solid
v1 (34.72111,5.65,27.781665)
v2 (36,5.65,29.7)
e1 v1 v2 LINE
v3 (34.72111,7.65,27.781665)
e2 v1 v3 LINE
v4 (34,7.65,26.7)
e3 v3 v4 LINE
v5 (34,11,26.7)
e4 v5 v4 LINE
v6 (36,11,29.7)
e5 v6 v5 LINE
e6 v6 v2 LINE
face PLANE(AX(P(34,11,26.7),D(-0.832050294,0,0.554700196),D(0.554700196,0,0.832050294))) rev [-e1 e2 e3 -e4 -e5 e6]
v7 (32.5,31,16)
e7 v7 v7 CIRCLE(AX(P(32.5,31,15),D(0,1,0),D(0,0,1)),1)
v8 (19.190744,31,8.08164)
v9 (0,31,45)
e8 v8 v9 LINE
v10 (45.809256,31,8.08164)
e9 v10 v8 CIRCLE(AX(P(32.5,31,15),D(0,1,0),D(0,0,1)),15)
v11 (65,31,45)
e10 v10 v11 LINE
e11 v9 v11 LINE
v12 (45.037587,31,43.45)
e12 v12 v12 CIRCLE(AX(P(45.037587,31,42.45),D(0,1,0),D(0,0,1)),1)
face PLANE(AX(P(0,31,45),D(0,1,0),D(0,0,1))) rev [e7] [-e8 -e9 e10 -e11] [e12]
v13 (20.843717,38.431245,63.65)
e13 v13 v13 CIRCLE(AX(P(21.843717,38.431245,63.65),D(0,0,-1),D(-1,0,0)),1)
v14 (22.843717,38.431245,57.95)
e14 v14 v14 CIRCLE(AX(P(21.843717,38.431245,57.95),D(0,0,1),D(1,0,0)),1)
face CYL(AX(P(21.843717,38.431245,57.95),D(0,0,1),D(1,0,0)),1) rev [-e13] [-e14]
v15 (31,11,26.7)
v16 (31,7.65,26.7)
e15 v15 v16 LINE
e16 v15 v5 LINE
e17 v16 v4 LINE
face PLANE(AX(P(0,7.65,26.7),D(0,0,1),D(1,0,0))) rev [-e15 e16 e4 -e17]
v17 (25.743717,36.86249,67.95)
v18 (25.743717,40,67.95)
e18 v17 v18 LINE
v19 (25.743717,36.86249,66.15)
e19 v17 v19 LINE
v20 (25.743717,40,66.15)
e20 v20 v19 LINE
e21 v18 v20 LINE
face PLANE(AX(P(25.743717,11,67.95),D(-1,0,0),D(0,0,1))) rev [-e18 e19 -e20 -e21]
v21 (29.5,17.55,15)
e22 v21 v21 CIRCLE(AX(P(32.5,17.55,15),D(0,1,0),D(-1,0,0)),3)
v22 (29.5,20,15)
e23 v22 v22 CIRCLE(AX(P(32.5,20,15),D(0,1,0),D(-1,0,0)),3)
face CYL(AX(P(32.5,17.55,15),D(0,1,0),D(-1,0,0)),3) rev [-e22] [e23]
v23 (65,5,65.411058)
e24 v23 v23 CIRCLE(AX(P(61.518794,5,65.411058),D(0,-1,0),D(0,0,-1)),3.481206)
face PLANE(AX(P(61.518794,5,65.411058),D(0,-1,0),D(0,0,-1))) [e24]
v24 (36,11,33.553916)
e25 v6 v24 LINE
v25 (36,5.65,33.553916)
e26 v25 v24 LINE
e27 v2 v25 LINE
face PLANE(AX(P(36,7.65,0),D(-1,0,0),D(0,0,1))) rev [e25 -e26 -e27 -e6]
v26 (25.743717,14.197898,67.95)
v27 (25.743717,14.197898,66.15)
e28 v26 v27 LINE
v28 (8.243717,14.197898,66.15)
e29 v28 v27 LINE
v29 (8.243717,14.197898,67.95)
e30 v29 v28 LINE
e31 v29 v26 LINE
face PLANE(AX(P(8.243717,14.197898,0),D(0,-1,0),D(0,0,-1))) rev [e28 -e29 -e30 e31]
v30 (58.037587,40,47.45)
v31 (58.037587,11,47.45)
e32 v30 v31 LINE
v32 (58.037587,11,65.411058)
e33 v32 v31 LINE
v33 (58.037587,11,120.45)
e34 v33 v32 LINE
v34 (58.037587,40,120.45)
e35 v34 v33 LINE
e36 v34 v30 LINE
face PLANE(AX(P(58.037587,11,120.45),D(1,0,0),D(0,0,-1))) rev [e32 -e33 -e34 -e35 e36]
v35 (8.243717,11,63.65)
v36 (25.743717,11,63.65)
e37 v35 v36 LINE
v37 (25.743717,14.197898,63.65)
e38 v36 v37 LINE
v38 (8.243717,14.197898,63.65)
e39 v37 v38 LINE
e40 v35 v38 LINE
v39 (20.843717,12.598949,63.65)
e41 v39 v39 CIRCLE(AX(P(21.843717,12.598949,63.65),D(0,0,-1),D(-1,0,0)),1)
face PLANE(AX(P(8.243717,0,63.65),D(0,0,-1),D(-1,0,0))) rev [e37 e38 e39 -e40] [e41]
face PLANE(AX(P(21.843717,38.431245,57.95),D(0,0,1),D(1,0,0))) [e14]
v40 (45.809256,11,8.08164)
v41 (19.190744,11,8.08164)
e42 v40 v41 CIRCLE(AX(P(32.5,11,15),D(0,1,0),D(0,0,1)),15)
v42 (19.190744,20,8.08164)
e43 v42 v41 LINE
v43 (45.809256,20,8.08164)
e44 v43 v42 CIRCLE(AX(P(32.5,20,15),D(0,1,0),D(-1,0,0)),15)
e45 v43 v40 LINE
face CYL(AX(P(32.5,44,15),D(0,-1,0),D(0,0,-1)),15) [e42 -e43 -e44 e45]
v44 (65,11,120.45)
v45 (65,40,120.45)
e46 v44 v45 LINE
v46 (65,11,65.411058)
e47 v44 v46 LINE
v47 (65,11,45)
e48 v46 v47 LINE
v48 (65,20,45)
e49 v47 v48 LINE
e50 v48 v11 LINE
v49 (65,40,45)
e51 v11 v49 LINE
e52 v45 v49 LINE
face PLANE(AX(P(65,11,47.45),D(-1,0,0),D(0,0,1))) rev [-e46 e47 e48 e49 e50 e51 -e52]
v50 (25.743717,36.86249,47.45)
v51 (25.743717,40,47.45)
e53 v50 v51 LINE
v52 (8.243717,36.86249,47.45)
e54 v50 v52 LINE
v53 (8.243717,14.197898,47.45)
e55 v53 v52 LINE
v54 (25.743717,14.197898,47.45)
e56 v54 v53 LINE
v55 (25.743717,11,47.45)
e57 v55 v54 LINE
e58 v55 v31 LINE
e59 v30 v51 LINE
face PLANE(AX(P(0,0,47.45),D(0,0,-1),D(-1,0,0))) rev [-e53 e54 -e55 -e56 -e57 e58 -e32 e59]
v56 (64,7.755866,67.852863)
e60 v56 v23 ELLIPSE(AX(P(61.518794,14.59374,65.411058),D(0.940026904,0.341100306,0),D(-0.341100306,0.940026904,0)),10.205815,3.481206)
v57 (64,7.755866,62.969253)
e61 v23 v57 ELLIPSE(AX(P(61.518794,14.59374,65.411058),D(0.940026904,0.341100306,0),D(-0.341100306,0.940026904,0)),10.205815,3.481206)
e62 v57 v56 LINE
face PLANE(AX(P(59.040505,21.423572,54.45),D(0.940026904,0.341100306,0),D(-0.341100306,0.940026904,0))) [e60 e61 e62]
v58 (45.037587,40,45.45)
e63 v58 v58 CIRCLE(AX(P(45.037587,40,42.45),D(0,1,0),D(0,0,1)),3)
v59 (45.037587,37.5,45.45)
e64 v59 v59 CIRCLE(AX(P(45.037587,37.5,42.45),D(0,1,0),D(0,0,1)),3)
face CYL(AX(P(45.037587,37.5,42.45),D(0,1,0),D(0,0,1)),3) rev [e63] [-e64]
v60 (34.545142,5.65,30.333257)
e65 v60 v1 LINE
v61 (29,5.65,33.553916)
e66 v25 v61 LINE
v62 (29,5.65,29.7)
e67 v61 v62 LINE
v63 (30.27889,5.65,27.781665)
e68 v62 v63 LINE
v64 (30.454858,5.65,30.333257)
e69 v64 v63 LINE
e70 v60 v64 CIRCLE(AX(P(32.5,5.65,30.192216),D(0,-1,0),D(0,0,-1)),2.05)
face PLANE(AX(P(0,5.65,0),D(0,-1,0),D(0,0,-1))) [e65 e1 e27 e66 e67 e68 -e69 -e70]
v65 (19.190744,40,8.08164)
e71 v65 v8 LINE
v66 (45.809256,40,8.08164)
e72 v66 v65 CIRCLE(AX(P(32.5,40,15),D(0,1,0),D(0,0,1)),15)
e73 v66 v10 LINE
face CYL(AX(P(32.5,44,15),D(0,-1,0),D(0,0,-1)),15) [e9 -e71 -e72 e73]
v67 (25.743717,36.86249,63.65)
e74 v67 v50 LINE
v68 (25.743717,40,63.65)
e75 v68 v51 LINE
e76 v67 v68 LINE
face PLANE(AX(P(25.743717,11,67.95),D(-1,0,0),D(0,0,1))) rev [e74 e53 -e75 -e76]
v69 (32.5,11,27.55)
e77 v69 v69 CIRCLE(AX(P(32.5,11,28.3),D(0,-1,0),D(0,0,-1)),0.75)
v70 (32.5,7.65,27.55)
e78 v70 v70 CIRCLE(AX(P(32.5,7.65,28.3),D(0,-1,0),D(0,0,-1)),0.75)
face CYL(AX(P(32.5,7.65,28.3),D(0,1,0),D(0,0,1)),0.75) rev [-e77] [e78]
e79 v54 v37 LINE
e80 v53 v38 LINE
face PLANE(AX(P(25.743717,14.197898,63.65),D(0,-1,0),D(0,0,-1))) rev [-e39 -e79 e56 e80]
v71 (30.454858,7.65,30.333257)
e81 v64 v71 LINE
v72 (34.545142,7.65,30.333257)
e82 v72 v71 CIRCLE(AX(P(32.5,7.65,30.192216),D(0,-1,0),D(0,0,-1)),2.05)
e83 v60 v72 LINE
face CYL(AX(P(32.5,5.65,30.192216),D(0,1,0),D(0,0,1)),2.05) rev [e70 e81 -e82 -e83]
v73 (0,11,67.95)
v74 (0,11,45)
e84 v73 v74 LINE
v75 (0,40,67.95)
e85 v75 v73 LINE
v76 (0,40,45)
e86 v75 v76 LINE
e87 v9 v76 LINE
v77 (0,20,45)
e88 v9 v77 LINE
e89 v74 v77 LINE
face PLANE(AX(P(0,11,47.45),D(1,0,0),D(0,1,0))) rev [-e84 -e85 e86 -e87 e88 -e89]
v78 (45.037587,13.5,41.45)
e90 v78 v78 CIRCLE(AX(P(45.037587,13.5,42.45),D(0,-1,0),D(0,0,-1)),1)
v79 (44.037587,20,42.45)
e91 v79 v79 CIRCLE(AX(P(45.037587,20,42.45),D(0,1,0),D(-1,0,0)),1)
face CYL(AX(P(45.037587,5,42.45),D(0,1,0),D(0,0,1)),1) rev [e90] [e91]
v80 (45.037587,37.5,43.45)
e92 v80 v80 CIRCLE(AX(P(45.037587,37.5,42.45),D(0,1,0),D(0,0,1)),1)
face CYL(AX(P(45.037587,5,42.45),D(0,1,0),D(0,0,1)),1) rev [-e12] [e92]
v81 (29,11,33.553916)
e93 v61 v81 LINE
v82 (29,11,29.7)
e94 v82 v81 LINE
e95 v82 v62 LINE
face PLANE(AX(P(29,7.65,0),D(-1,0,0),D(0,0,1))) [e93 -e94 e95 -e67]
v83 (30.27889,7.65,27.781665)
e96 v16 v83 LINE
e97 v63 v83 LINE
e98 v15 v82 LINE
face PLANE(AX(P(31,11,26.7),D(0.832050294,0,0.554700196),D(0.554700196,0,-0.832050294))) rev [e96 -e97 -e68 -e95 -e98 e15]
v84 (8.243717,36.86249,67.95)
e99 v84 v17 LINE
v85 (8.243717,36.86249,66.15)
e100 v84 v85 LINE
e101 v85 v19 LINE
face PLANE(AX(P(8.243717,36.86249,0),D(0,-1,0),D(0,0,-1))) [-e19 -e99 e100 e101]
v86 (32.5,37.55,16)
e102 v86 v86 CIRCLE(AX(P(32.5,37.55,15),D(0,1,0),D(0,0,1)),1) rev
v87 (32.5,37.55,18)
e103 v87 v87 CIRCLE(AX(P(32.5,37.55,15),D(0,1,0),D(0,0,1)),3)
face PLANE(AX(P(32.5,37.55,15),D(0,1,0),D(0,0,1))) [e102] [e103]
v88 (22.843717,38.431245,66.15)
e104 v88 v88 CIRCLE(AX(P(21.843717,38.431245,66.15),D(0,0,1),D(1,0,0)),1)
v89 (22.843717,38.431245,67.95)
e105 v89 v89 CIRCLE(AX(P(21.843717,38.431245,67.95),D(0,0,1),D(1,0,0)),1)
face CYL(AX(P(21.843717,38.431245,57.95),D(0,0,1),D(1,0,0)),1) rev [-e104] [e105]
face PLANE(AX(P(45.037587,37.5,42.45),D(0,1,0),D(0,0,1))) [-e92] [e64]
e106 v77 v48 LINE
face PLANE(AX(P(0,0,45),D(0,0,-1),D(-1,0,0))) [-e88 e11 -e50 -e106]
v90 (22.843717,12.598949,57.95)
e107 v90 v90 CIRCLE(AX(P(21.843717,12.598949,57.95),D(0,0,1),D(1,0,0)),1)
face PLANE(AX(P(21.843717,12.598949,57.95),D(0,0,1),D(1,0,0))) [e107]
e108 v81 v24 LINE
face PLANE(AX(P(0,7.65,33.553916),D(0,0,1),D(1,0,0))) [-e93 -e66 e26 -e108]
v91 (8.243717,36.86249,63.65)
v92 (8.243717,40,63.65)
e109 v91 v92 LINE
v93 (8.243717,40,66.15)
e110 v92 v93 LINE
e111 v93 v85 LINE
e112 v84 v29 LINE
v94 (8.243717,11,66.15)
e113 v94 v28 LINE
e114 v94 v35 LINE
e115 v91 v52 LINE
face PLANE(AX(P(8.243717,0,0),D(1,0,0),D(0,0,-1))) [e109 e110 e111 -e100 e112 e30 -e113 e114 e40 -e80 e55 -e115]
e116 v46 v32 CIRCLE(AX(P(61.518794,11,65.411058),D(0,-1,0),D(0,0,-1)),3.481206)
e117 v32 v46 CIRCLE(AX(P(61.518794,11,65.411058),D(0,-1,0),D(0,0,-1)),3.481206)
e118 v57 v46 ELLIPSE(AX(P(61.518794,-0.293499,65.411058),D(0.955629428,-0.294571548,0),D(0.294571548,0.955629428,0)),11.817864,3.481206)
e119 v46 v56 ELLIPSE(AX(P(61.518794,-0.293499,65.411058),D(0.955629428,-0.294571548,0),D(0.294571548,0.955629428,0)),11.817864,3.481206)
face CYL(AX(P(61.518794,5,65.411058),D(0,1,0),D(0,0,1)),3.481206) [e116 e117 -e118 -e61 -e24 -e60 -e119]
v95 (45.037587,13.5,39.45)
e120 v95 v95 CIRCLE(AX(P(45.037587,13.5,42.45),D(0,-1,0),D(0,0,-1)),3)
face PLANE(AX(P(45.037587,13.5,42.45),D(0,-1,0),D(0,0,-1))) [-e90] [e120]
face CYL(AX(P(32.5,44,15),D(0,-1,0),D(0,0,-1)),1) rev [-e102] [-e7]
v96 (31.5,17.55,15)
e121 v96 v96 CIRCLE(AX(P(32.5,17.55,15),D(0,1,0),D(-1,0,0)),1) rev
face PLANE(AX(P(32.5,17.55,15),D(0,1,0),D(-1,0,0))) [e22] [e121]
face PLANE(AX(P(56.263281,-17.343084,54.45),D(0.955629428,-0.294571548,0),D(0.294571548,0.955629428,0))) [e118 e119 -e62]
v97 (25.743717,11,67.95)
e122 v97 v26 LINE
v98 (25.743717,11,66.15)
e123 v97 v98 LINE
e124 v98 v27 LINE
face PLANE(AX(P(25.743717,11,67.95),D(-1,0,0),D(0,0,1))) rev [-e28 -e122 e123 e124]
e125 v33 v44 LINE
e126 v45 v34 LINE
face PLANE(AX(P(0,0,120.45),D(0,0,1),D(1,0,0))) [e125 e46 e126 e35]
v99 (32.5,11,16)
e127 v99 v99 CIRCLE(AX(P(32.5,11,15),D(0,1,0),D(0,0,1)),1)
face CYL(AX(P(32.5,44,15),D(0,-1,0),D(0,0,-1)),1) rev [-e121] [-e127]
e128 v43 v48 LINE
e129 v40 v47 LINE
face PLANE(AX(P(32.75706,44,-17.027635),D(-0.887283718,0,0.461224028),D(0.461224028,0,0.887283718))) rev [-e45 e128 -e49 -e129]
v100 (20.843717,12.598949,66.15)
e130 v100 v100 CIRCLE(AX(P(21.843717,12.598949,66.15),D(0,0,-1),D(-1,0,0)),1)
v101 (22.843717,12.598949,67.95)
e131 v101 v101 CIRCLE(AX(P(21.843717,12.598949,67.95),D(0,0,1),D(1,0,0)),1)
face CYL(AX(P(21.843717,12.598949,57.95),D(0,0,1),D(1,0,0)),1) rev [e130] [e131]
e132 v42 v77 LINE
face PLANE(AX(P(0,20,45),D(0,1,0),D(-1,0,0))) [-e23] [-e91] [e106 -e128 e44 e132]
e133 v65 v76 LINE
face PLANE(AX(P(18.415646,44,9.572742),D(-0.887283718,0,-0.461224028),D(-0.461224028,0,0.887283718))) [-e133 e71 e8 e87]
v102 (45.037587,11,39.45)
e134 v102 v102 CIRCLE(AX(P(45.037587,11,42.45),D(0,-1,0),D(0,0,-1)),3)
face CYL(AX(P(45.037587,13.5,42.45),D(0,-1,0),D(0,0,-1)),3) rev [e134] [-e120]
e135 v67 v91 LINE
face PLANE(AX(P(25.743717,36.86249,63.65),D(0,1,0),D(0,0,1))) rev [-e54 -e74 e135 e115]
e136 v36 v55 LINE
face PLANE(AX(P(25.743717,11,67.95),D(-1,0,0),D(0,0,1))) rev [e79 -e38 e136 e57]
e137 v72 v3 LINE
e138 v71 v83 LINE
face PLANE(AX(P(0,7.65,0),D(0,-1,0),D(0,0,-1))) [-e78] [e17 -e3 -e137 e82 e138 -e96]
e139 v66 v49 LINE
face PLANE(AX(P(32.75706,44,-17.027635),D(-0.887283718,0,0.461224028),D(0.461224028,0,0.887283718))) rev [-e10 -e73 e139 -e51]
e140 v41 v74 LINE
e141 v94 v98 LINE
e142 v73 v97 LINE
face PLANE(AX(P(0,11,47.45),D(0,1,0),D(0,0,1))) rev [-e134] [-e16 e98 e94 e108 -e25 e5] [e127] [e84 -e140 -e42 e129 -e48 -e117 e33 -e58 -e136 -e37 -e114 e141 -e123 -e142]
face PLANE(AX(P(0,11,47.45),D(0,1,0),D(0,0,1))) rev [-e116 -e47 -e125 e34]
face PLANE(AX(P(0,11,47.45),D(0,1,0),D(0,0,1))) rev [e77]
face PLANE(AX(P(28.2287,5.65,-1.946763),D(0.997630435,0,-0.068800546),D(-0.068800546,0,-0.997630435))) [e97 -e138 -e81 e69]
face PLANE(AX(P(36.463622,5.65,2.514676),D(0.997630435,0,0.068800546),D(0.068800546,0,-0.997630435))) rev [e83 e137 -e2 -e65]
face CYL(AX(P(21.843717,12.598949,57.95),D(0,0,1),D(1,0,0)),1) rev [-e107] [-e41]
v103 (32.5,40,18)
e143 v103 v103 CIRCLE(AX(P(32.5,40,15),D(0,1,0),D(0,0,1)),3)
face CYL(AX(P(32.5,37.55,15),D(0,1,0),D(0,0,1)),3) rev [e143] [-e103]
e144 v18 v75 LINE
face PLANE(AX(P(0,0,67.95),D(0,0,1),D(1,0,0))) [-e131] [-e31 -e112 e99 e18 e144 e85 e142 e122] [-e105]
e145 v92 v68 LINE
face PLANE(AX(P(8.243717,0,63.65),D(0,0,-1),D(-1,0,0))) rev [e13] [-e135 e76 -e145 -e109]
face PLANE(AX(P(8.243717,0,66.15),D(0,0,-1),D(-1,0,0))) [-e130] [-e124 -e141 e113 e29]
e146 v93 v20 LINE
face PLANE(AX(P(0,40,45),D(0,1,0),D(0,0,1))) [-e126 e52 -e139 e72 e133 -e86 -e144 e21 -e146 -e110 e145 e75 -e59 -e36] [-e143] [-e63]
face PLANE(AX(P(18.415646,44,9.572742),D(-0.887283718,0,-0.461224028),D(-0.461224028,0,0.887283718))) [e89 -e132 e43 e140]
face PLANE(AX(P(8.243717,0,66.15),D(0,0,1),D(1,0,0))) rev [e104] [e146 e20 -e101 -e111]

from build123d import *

# Parameters (mm, degrees)
SKETCH1_W             = 65
SKETCH1_H             = 9
BOSS_EXTRUDE1_DEPTH   = 45
BOSS_EXTRUDE1_2_DEPTH = 45
SKETCH2_R             = 1
CUT_EXTRUDE5_DEPTH    = 34
CUT_EXTRUDE6_DEPTH    = 34
SKETCH3_R             = 3
CUT_EXTRUDE7_DEPTH    = 2.45
SKETCH4_R             = 3
CUT_EXTRUDE8_DEPTH    = 2.45
SKETCH5_W             = 65
SKETCH5_H             = 29
BOSS_EXTRUDE2_DEPTH   = 2.45
SKETCH6_W             = 7
SKETCH6_H             = 6.853915881
SKETCH6_R             = 0.75
BOSS_EXTRUDE3_DEPTH   = 3.35
CUT_EXTRUDE9_DEPTH    = 3.35
BOSS_EXTRUDE4_DEPTH   = 2
SKETCH9_W             = 6.962412957
SKETCH9_H             = 29
BOSS_EXTRUDE5_DEPTH   = 73
SKETCH10_R            = 3
CUT_EXTRUDE10_DEPTH   = 2.5
CUT_EXTRUDE11_START   = -2.5
SKETCH11_R            = 3
CUT_EXTRUDE11_DEPTH   = 2.5
SKETCH12_R            = 1
CUT_EXTRUDE12_DEPTH   = 32.5
SKETCH13_W            = 25.743716973
SKETCH13_H            = 29
BOSS_EXTRUDE6_DEPTH   = 20.5
SKETCH14_W            = 16.2
SKETCH14_H            = 32.7
CUT_EXTRUDE13_DEPTH   = 17.5
SKETCH16_W            = 16.2
SKETCH16_H            = 3.197897976
SKETCH16_H_2          = 3.137509592
BOSS_EXTRUDE7_DEPTH   = 17.5
CUT_EXTRUDE14_DEPTH   = 17.5
SKETCH19_R            = 1
CUT_EXTRUDE15_DEPTH   = 10
SKETCH20_R            = 3.481206478
BOSS_EXTRUDE8_DEPTH   = 6
CUT_EXTRUDE17_DEPTH   = 66


with BuildPart() as part:
    # Sketch1 → Boss-Extrude1 (new body)
    with BuildSketch(Plane.XY):
        with Locations((32.5, 15.5)):
            Rectangle(SKETCH1_W, SKETCH1_H)
    extrude(amount=BOSS_EXTRUDE1_DEPTH)


with BuildPart() as body_2:
    # Sketch1 → Boss-Extrude1 2 (new body)
    with BuildSketch(Plane.XY):
        with Locations((32.5, 35.5)):
            Rectangle(SKETCH1_W, SKETCH1_H)
    extrude(amount=BOSS_EXTRUDE1_2_DEPTH)


with BuildPart() as cut_extrude5_tool:
    # Sketch2 → Cut-Extrude5 (new body)
    with BuildSketch(Plane.XZ.offset(-10)):
        with BuildLine():
            ThreePointArc((45.80925577, 8.081639583), (40.285389963, 2.178623197), (32.5, 0))
            Line((32.5, 0), (65, 0))
            Line((65, 0), (65, 45))
            Line((65, 45), (45.80925577, 8.081639583))
        make_face()
        with Locations((32.5, 15)):
            Circle(SKETCH2_R)
    extrude(amount=-CUT_EXTRUDE5_DEPTH)


with BuildPart() as part_1:
    add(part.part)

    # Cut-Extrude5: cut by cut_extrude5_tool
    add(cut_extrude5_tool.part, mode=Mode.SUBTRACT)


with BuildPart() as body_2_1:
    add(body_2.part)

    # Cut-Extrude5: cut by cut_extrude5_tool
    add(cut_extrude5_tool.part, mode=Mode.SUBTRACT)


with BuildPart() as cut_extrude6_tool:
    # Sketch2<6> → Cut-Extrude6 (new body)
    with BuildSketch(Plane.XZ.offset(-10)):
        with BuildLine():
            Line((19.19074423, 8.081639583), (0, 45))
            Line((0, 45), (0, 0))
            Line((0, 0), (32.5, 0))
            ThreePointArc((32.5, 0), (24.714610037, 2.178623197), (19.19074423, 8.081639583))
        make_face()
    extrude(amount=-CUT_EXTRUDE6_DEPTH)


with BuildPart() as part_2:
    add(part_1.part)

    # Cut-Extrude6: cut by cut_extrude6_tool
    add(cut_extrude6_tool.part, mode=Mode.SUBTRACT)

    # Sketch4 → Cut-Extrude8 (cut)
    with BuildSketch(Plane(origin=(0, 20, 0), x_dir=(1, 0, 0), z_dir=(0, 1, 0))):
        with Locations((32.5, -15)):
            Circle(SKETCH4_R)
    extrude(amount=-CUT_EXTRUDE8_DEPTH, mode=Mode.SUBTRACT)



with BuildPart() as body_2_2:
    add(body_2_1.part)

    # Cut-Extrude6: cut by cut_extrude6_tool
    add(cut_extrude6_tool.part, mode=Mode.SUBTRACT)

    # Sketch3 → Cut-Extrude7 (cut)
    with BuildSketch(Plane(origin=(0, 40, 0), x_dir=(1, 0, 0), z_dir=(0, 1, 0))):
        with Locations((32.5, -15)):
            Circle(SKETCH3_R)
    extrude(amount=-CUT_EXTRUDE7_DEPTH, mode=Mode.SUBTRACT)


with BuildPart() as part_3:
    add(part_2.part)

    add(body_2_2.part)  # Boss-Extrude2 merges body 2
    # Sketch5 → Boss-Extrude2 (add)
    with BuildSketch(Plane.XY.offset(45)):
        with Locations((32.5, 25.5)):
            Rectangle(SKETCH5_W, SKETCH5_H)
    extrude(amount=BOSS_EXTRUDE2_DEPTH)

    # Sketch6 → Boss-Extrude3 (add)
    with BuildSketch(Plane.XZ.offset(-11)):
        with Locations((32.5, 30.126957941)):
            Rectangle(SKETCH6_W, SKETCH6_H)
        with Locations((32.5, 28.3)):
            Circle(SKETCH6_R, mode=Mode.SUBTRACT)
    extrude(amount=BOSS_EXTRUDE3_DEPTH)

    # Sketch7 → Cut-Extrude9 (cut)
    with BuildSketch(Plane.XZ.offset(-7.65)):
        Polygon((29, 29.7), (29, 26.7), (31, 26.7), align=None)
        Polygon((34, 26.7), (36, 29.7), (36, 26.7), align=None)
    extrude(amount=-CUT_EXTRUDE9_DEPTH, mode=Mode.SUBTRACT)

    # Sketch8 → Boss-Extrude4 (add)
    with BuildSketch(Plane.XZ.offset(-7.65)):
        with BuildLine():
            ThreePointArc((30.454857608, 30.333257), (32.5, 32.242215881), (34.545142392, 30.333257))
            Line((34.545142392, 30.333257), (34.721110255, 27.781665383))
            Line((34.721110255, 27.781665383), (36, 29.7))
            Line((36, 29.7), (36, 33.553915881))
            Line((36, 33.553915881), (29, 33.553915881))
            Line((29, 33.553915881), (29, 29.7))
            Line((29, 29.7), (30.278889745, 27.781665383))
            Line((30.278889745, 27.781665383), (30.454857608, 30.333257))
        make_face()
    extrude(amount=BOSS_EXTRUDE4_DEPTH)

    # Sketch9 → Boss-Extrude5 (add)
    with BuildSketch(Plane.XY.offset(47.45)):
        with Locations((61.518793522, 25.5)):
            Rectangle(SKETCH9_W, SKETCH9_H)
    extrude(amount=BOSS_EXTRUDE5_DEPTH)

    # Sketch10 → Cut-Extrude10 (cut)
    with BuildSketch(Plane.XZ.offset(-11)):
        with Locations((45.037587043, 42.45)):
            Circle(SKETCH10_R)
    extrude(amount=-CUT_EXTRUDE10_DEPTH, mode=Mode.SUBTRACT)

    # Sketch11 → Cut-Extrude11 (cut)
    with BuildSketch(Plane(origin=(0, 40, 0), x_dir=(1, 0, 0), z_dir=(0, 1, 0)).offset(CUT_EXTRUDE11_START)):
        with Locations((45.037587043, -42.45)):
            Circle(SKETCH11_R)
    extrude(amount=CUT_EXTRUDE11_DEPTH, mode=Mode.SUBTRACT)

    # Sketch12 → Cut-Extrude12 (cut)
    with BuildSketch(Plane(origin=(0, 37.5, 0), x_dir=(1, 0, 0), z_dir=(0, 1, 0))):
        with Locations((45.037587043, -42.45)):
            Circle(SKETCH12_R)
    extrude(amount=-CUT_EXTRUDE12_DEPTH, mode=Mode.SUBTRACT)

    # Sketch13 → Boss-Extrude6 (add)
    with BuildSketch(Plane.XY.offset(47.45)):
        with Locations((12.871858487, 25.5)):
            Rectangle(SKETCH13_W, SKETCH13_H)
    extrude(amount=BOSS_EXTRUDE6_DEPTH)

    # Sketch14 → Cut-Extrude13 (cut)
    with BuildSketch(Plane(origin=(25.743716973, 0, 0), x_dir=(0, 0, -1), z_dir=(1, 0, 0))):
        with Locations((-55.55, 25.5)):
            Rectangle(SKETCH14_W, SKETCH14_H)
    extrude(amount=-CUT_EXTRUDE13_DEPTH, mode=Mode.SUBTRACT)

    # Sketch16 → Boss-Extrude7 (add)
    with BuildSketch(Plane(origin=(8.243716973, 0, 0), x_dir=(0, 0, -1), z_dir=(1, 0, 0))):
        with Locations((-55.55, 12.598948988)):
            Rectangle(SKETCH16_W, SKETCH16_H)
        with Locations((-55.55, 38.431245204)):
            Rectangle(SKETCH16_W, SKETCH16_H_2)
    extrude(amount=BOSS_EXTRUDE7_DEPTH)

    # Sketch17 → Cut-Extrude14 (cut)
    with BuildSketch(Plane(origin=(25.743716973, 0, 0), x_dir=(0, 0, -1), z_dir=(1, 0, 0))):
        Polygon((-66.15, 14.197897976), (-66.15, 11), (-63.65, 11), (-63.65, 40), (-66.15, 40), (-66.15, 36.862490408), (-67.95, 36.862490408), (-67.95, 14.197897976), align=None)
    extrude(amount=-CUT_EXTRUDE14_DEPTH, mode=Mode.SUBTRACT)

    # Sketch19 → Cut-Extrude15 (cut)
    with BuildSketch(Plane.XY.offset(67.95)):
        with Locations((21.843716973, 12.598948988)):
            Circle(SKETCH19_R)
        with Locations((21.843716973, 38.431245204)):
            Circle(SKETCH19_R)
    extrude(amount=-CUT_EXTRUDE15_DEPTH, mode=Mode.SUBTRACT)

    # Sketch20 → Boss-Extrude8 (add)
    with BuildSketch(Plane.XZ.offset(-11)):
        with Locations((61.518793522, 65.411058123)):
            Circle(SKETCH20_R)
    extrude(amount=BOSS_EXTRUDE8_DEPTH)

    # Sketch22 → Cut-Extrude17 (cut)
    with BuildSketch(Plane.XY.offset(120.45)):
        Polygon((65, 11), (64, 7.755866492), (65, 5), align=None)
    extrude(amount=-CUT_EXTRUDE17_DEPTH, mode=Mode.SUBTRACT)


solid = part_3.part
